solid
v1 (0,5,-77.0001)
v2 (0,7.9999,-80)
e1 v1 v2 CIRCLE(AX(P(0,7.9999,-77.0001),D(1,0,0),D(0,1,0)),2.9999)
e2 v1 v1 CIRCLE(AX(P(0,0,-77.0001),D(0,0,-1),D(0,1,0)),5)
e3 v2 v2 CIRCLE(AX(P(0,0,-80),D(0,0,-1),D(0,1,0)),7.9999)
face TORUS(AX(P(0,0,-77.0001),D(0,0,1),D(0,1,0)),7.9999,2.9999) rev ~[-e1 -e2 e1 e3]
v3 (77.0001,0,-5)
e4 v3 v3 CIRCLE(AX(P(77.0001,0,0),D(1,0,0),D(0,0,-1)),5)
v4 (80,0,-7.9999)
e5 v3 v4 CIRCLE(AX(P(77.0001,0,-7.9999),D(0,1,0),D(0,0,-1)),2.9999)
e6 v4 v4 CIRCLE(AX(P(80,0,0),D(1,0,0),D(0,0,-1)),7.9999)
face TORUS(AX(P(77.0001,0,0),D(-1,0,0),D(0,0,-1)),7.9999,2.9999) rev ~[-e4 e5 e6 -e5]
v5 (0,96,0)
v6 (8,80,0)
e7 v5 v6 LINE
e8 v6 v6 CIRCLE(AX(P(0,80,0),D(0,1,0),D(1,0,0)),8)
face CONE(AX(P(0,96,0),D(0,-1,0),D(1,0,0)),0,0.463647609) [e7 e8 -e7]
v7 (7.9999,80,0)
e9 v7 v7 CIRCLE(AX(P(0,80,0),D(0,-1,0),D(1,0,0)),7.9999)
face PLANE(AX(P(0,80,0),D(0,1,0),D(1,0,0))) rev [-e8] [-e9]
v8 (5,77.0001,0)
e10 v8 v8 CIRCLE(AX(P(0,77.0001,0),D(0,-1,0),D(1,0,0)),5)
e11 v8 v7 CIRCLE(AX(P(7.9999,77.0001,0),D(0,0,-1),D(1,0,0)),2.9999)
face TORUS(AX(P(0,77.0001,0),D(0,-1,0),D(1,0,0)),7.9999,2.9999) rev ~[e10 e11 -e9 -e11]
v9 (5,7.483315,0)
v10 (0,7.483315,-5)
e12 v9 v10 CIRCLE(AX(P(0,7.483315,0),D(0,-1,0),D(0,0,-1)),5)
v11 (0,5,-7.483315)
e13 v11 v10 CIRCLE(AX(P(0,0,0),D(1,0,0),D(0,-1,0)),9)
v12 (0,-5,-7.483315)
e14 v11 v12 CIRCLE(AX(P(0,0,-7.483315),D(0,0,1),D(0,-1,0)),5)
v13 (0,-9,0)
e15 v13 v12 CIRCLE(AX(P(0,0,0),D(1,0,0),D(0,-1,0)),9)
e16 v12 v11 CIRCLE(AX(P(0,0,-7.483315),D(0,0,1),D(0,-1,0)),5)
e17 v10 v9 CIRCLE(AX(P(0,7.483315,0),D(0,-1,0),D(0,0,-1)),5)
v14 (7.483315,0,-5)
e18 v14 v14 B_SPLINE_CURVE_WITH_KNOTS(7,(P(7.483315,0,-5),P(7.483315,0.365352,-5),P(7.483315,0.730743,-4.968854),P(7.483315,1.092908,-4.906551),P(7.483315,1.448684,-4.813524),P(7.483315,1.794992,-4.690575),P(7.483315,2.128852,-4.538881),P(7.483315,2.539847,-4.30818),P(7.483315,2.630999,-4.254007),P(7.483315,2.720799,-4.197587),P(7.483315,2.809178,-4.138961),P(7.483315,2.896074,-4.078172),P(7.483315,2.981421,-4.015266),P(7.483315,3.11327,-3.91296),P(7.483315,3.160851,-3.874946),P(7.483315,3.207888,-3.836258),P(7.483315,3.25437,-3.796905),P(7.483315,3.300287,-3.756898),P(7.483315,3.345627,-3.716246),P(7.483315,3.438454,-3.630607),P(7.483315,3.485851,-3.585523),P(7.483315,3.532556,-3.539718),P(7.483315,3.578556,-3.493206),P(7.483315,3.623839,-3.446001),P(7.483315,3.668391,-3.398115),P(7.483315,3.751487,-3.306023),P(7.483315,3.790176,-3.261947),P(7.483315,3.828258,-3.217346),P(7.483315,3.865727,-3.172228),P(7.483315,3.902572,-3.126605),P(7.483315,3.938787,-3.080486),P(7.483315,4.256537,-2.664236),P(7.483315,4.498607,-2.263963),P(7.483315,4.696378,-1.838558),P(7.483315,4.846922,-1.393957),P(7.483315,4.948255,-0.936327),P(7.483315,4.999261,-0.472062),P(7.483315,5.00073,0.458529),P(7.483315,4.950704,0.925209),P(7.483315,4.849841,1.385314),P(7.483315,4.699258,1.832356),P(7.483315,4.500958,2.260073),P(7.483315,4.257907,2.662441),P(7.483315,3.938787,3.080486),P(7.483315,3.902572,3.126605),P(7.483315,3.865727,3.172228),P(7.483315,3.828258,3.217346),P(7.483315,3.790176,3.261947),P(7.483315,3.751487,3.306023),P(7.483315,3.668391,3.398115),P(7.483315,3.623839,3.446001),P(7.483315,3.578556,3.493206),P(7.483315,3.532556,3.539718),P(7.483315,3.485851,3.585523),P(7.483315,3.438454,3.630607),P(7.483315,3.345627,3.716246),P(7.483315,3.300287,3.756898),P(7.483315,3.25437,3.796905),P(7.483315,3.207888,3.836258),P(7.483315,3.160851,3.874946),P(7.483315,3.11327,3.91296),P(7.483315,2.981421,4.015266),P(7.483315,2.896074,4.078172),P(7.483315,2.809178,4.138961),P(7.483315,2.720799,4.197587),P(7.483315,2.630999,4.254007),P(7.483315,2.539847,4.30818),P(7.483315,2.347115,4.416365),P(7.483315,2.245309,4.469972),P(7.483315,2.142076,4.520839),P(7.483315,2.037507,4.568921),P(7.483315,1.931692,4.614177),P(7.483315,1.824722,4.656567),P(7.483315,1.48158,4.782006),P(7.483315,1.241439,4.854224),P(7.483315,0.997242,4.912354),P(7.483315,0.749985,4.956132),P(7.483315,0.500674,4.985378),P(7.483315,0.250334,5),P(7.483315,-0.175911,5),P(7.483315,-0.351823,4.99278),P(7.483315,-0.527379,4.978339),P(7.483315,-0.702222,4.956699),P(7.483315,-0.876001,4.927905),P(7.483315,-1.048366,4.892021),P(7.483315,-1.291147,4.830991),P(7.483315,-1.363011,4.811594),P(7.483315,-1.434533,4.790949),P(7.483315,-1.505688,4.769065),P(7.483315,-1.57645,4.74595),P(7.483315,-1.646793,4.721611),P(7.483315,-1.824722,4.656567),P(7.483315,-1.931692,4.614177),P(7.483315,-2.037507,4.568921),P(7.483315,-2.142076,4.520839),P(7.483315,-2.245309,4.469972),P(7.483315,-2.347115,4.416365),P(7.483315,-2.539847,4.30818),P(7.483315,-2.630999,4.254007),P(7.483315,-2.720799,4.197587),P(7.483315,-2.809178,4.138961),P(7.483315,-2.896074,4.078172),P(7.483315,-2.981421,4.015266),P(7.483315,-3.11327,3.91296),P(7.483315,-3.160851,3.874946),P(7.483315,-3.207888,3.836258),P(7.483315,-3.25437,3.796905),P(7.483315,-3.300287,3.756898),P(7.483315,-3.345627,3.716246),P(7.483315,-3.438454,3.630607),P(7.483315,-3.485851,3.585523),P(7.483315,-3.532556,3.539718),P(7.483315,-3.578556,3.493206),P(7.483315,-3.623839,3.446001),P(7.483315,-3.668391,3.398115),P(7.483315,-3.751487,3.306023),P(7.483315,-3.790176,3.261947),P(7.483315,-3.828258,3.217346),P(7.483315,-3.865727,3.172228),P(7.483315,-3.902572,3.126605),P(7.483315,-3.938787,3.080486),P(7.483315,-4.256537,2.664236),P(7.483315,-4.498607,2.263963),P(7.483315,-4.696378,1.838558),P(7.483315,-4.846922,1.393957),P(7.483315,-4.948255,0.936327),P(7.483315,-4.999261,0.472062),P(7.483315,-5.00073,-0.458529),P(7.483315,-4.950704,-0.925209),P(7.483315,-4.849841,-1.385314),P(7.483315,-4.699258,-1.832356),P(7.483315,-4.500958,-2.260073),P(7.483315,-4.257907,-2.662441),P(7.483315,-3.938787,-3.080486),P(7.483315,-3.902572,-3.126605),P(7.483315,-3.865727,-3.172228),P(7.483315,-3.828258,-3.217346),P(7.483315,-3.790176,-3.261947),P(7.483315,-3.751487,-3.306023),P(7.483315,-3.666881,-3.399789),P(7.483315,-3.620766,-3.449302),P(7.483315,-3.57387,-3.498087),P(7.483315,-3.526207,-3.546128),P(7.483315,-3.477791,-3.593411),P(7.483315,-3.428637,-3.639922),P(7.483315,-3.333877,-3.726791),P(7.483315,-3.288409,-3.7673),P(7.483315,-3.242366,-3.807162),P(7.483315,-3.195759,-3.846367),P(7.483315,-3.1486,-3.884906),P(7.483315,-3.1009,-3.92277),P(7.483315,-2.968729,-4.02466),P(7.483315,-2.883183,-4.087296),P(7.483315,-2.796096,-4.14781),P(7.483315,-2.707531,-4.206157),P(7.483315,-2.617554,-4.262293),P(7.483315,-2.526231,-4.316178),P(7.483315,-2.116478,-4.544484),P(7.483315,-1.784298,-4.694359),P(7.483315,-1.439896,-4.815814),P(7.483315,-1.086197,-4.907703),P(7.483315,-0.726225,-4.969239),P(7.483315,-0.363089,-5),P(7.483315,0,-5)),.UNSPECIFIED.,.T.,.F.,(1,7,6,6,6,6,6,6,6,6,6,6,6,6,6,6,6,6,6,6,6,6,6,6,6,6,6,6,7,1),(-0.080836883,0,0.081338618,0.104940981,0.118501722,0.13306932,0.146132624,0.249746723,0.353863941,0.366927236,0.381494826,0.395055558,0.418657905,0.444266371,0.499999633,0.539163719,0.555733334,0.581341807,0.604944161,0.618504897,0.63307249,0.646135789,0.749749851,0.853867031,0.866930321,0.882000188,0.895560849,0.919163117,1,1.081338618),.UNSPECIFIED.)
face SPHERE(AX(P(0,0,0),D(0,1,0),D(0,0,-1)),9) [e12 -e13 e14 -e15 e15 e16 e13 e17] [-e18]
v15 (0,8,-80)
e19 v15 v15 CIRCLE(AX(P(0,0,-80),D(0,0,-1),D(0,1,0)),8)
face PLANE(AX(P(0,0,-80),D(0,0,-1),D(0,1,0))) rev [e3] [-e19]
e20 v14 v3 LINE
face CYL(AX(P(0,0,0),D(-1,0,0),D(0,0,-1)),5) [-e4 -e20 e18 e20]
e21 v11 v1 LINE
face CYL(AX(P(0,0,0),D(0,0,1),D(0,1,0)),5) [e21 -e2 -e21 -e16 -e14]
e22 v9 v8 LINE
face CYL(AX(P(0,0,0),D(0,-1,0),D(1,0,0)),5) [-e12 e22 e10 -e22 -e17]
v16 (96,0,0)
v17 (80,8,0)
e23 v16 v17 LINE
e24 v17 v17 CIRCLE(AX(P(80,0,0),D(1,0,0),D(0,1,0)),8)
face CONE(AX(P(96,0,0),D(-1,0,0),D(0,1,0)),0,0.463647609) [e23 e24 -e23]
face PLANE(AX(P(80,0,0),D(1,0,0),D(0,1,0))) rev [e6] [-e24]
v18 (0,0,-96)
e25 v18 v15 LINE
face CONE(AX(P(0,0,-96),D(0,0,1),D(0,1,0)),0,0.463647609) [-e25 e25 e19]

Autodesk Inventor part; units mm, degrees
ref_plane "YZ Plane" through (0, 0, 0) normal (1, 0, 0) x (0, 1, 0)
ref_plane "XZ Plane" through (0, 0, 0) normal (0, 1, 0) x (-1, 0, 0)
ref_plane "XY Plane" through (0, 0, 0) normal (0, 0, 1) x (1, 0, 0)
sketch "Schizzo1" plane through (0, 0, 0) normal (0, 1, 0) x (-1, 0, 0)
  line L0 (1.5, 0) -> (-1.5, 0)
  arc A0 (1.5, 0) -> (-1.5, 0) centre (0, 0) ccw
  dimension "d11" = 3
revolve "Rivoluzione1" add sketch "Schizzo1" angle 360 about axis through (-1.5, 0, 0) along (1, 0, 0)
sketch "Schizzo3" plane through (0, 0, 0) normal (0, 0, -1) x (0, 1, 0)
  circle A0 centre (0, 0) radius 5
  dimension "d19" = 10
extrude "Estrusione2" add sketch "Schizzo3" along normal blind 80
sketch "Schizzo4" plane through (0, 0, 0) normal (1, 0, 0) x (0, 0, -1)
  circle A0 centre (0, 0) radius 5
  dimension "d22" = 10
extrude "Estrusione3" add sketch "Schizzo4" along normal blind 80
sketch "Schizzo5" plane through (0, 0, 0) normal (0, 1, 0) x (1, 0, 0)
  line L0 (0, -5) -> (0, 0) projected
  circle A0 centre (0, 0) radius 5
  dimension "d25" = 10
extrude "Estrusione4" add sketch "Schizzo5" along normal blind 80
sketch "Schizzo6" plane through (0, 0, 0) normal (1, 0, 0) x (0, 0, -1)
  line L0 (0, -9) -> (0, 9)
  line L1 (0, 0) -> (-5, 0) projected
  arc A0 (0, -9) -> (0, 9) centre (0, 0) ccw
  dimension "d28" = 18
revolve "Rivoluzione3" add sketch "Schizzo6" angle 360 about axis through (0, -9, 0) along (0, 1, 0)
sketch "Schizzo7" plane through (0, 0, 0) normal (0, 0, -1) x (0, 1, 0)
  line L0 (7.4833, -5) -> (7.4833, 5) projected
  line L1 (80, -5) -> (80, 5) projected
  line L2 (5, 7.4833) -> (-5, 7.4833) projected
  line L3 (5, 80) -> (-5, 80) projected
  line L4 (0, 0) -> (80, 0)
  line L5 (80, 0) -> (80, 8)
  line L6 (80, -5) -> (80, 5) projected
  line L7 (80, 0) -> (88, 0) construction
  line L8 (80, 0) -> (96, 0)
  line L9 (80, 0) -> (96, 0) construction
  line L10 (96, 0) -> (80, 8)
  point P0 (96, 0)
  dimension "d30" = 8
  dimension "d31" = 90
  dimension "d32" = 16
  dimension "d33" = 0
revolve "Rivoluzione4" add sketch "Schizzo7" angle 360 about axis through (0, 80, 0) along (0, 1, 0)
sketch "Schizzo8" plane through (0, 0, 0) normal (1, 0, 0) x (0, 0, -1)
  line L0 (0, 0) -> (80, 0)
  line L1 (7.4833, -5) -> (7.4833, 5) projected
  line L2 (80, -5) -> (80, 5) projected
  line L3 (80, 0) -> (80, 8)
  line L4 (80, -5) -> (80, 5) projected
  line L5 (80, 0) -> (88, 0) construction
  line L6 (80, 0) -> (96, 0)
  line L7 (80, 0) -> (96, 0) construction
  line L8 (96, 0) -> (80, 8)
  dimension "d35" = 8
  dimension "d36" = 90
  dimension "d37" = 16
  dimension "d38" = 0
revolve "Rivoluzione5" add sketch "Schizzo8" angle 360 about axis through (0, 0, -80) along (0, 0, -1)
sketch "Schizzo9" plane through (0, 0, 0) normal (0, 0, -1) x (0, 1, 0)
  line L0 (5, 7.4833) -> (-5, 7.4833) projected
  line L1 (5, 80) -> (-5, 80) projected
  circle A0 centre (0, 0) radius 8 projected
  line L2 (0, 0) -> (0, 80)
  line L3 (0, 80) -> (8, 80)
  line L4 (5, 80) -> (-5, 80) projected
  line L5 (0, 80) -> (8, 80) construction
  line L6 (0, 80) -> (0, 96)
  line L7 (0, 80) -> (16, 80) construction
  line L8 (0, 96) -> (8, 80)
  dimension "d40" = 8
  dimension "d41" = 0
  dimension "d42" = 16
  dimension "d43" = 90
revolve "Rivoluzione6" add sketch "Schizzo9" angle 360 about axis through (80, 0, 0) along (1, 0, 0) contours L1 L6 L8 L3
fillet "Raccordo1" radius 3 1 edges at (0, -5, -80)
fillet "Raccordo2" radius 3 1 edges at (-5, 80, 0)
fillet "Raccordo3" radius 3 1 edges at (80, 0, 5)
ref_plane "PianoY" through (0, 0, -96) normal (0, 0, -1) x (-1, 0, 0)
ref_plane "PianoX" through (96, 0, 0) normal (-1, 0, 0) x (0, -1, 0)
ref_plane "PianoZ" through (0, 96, 0) normal (0, 1, 0) x (-1, 0, 0)
properties part number "0_Sistemariferimento"
